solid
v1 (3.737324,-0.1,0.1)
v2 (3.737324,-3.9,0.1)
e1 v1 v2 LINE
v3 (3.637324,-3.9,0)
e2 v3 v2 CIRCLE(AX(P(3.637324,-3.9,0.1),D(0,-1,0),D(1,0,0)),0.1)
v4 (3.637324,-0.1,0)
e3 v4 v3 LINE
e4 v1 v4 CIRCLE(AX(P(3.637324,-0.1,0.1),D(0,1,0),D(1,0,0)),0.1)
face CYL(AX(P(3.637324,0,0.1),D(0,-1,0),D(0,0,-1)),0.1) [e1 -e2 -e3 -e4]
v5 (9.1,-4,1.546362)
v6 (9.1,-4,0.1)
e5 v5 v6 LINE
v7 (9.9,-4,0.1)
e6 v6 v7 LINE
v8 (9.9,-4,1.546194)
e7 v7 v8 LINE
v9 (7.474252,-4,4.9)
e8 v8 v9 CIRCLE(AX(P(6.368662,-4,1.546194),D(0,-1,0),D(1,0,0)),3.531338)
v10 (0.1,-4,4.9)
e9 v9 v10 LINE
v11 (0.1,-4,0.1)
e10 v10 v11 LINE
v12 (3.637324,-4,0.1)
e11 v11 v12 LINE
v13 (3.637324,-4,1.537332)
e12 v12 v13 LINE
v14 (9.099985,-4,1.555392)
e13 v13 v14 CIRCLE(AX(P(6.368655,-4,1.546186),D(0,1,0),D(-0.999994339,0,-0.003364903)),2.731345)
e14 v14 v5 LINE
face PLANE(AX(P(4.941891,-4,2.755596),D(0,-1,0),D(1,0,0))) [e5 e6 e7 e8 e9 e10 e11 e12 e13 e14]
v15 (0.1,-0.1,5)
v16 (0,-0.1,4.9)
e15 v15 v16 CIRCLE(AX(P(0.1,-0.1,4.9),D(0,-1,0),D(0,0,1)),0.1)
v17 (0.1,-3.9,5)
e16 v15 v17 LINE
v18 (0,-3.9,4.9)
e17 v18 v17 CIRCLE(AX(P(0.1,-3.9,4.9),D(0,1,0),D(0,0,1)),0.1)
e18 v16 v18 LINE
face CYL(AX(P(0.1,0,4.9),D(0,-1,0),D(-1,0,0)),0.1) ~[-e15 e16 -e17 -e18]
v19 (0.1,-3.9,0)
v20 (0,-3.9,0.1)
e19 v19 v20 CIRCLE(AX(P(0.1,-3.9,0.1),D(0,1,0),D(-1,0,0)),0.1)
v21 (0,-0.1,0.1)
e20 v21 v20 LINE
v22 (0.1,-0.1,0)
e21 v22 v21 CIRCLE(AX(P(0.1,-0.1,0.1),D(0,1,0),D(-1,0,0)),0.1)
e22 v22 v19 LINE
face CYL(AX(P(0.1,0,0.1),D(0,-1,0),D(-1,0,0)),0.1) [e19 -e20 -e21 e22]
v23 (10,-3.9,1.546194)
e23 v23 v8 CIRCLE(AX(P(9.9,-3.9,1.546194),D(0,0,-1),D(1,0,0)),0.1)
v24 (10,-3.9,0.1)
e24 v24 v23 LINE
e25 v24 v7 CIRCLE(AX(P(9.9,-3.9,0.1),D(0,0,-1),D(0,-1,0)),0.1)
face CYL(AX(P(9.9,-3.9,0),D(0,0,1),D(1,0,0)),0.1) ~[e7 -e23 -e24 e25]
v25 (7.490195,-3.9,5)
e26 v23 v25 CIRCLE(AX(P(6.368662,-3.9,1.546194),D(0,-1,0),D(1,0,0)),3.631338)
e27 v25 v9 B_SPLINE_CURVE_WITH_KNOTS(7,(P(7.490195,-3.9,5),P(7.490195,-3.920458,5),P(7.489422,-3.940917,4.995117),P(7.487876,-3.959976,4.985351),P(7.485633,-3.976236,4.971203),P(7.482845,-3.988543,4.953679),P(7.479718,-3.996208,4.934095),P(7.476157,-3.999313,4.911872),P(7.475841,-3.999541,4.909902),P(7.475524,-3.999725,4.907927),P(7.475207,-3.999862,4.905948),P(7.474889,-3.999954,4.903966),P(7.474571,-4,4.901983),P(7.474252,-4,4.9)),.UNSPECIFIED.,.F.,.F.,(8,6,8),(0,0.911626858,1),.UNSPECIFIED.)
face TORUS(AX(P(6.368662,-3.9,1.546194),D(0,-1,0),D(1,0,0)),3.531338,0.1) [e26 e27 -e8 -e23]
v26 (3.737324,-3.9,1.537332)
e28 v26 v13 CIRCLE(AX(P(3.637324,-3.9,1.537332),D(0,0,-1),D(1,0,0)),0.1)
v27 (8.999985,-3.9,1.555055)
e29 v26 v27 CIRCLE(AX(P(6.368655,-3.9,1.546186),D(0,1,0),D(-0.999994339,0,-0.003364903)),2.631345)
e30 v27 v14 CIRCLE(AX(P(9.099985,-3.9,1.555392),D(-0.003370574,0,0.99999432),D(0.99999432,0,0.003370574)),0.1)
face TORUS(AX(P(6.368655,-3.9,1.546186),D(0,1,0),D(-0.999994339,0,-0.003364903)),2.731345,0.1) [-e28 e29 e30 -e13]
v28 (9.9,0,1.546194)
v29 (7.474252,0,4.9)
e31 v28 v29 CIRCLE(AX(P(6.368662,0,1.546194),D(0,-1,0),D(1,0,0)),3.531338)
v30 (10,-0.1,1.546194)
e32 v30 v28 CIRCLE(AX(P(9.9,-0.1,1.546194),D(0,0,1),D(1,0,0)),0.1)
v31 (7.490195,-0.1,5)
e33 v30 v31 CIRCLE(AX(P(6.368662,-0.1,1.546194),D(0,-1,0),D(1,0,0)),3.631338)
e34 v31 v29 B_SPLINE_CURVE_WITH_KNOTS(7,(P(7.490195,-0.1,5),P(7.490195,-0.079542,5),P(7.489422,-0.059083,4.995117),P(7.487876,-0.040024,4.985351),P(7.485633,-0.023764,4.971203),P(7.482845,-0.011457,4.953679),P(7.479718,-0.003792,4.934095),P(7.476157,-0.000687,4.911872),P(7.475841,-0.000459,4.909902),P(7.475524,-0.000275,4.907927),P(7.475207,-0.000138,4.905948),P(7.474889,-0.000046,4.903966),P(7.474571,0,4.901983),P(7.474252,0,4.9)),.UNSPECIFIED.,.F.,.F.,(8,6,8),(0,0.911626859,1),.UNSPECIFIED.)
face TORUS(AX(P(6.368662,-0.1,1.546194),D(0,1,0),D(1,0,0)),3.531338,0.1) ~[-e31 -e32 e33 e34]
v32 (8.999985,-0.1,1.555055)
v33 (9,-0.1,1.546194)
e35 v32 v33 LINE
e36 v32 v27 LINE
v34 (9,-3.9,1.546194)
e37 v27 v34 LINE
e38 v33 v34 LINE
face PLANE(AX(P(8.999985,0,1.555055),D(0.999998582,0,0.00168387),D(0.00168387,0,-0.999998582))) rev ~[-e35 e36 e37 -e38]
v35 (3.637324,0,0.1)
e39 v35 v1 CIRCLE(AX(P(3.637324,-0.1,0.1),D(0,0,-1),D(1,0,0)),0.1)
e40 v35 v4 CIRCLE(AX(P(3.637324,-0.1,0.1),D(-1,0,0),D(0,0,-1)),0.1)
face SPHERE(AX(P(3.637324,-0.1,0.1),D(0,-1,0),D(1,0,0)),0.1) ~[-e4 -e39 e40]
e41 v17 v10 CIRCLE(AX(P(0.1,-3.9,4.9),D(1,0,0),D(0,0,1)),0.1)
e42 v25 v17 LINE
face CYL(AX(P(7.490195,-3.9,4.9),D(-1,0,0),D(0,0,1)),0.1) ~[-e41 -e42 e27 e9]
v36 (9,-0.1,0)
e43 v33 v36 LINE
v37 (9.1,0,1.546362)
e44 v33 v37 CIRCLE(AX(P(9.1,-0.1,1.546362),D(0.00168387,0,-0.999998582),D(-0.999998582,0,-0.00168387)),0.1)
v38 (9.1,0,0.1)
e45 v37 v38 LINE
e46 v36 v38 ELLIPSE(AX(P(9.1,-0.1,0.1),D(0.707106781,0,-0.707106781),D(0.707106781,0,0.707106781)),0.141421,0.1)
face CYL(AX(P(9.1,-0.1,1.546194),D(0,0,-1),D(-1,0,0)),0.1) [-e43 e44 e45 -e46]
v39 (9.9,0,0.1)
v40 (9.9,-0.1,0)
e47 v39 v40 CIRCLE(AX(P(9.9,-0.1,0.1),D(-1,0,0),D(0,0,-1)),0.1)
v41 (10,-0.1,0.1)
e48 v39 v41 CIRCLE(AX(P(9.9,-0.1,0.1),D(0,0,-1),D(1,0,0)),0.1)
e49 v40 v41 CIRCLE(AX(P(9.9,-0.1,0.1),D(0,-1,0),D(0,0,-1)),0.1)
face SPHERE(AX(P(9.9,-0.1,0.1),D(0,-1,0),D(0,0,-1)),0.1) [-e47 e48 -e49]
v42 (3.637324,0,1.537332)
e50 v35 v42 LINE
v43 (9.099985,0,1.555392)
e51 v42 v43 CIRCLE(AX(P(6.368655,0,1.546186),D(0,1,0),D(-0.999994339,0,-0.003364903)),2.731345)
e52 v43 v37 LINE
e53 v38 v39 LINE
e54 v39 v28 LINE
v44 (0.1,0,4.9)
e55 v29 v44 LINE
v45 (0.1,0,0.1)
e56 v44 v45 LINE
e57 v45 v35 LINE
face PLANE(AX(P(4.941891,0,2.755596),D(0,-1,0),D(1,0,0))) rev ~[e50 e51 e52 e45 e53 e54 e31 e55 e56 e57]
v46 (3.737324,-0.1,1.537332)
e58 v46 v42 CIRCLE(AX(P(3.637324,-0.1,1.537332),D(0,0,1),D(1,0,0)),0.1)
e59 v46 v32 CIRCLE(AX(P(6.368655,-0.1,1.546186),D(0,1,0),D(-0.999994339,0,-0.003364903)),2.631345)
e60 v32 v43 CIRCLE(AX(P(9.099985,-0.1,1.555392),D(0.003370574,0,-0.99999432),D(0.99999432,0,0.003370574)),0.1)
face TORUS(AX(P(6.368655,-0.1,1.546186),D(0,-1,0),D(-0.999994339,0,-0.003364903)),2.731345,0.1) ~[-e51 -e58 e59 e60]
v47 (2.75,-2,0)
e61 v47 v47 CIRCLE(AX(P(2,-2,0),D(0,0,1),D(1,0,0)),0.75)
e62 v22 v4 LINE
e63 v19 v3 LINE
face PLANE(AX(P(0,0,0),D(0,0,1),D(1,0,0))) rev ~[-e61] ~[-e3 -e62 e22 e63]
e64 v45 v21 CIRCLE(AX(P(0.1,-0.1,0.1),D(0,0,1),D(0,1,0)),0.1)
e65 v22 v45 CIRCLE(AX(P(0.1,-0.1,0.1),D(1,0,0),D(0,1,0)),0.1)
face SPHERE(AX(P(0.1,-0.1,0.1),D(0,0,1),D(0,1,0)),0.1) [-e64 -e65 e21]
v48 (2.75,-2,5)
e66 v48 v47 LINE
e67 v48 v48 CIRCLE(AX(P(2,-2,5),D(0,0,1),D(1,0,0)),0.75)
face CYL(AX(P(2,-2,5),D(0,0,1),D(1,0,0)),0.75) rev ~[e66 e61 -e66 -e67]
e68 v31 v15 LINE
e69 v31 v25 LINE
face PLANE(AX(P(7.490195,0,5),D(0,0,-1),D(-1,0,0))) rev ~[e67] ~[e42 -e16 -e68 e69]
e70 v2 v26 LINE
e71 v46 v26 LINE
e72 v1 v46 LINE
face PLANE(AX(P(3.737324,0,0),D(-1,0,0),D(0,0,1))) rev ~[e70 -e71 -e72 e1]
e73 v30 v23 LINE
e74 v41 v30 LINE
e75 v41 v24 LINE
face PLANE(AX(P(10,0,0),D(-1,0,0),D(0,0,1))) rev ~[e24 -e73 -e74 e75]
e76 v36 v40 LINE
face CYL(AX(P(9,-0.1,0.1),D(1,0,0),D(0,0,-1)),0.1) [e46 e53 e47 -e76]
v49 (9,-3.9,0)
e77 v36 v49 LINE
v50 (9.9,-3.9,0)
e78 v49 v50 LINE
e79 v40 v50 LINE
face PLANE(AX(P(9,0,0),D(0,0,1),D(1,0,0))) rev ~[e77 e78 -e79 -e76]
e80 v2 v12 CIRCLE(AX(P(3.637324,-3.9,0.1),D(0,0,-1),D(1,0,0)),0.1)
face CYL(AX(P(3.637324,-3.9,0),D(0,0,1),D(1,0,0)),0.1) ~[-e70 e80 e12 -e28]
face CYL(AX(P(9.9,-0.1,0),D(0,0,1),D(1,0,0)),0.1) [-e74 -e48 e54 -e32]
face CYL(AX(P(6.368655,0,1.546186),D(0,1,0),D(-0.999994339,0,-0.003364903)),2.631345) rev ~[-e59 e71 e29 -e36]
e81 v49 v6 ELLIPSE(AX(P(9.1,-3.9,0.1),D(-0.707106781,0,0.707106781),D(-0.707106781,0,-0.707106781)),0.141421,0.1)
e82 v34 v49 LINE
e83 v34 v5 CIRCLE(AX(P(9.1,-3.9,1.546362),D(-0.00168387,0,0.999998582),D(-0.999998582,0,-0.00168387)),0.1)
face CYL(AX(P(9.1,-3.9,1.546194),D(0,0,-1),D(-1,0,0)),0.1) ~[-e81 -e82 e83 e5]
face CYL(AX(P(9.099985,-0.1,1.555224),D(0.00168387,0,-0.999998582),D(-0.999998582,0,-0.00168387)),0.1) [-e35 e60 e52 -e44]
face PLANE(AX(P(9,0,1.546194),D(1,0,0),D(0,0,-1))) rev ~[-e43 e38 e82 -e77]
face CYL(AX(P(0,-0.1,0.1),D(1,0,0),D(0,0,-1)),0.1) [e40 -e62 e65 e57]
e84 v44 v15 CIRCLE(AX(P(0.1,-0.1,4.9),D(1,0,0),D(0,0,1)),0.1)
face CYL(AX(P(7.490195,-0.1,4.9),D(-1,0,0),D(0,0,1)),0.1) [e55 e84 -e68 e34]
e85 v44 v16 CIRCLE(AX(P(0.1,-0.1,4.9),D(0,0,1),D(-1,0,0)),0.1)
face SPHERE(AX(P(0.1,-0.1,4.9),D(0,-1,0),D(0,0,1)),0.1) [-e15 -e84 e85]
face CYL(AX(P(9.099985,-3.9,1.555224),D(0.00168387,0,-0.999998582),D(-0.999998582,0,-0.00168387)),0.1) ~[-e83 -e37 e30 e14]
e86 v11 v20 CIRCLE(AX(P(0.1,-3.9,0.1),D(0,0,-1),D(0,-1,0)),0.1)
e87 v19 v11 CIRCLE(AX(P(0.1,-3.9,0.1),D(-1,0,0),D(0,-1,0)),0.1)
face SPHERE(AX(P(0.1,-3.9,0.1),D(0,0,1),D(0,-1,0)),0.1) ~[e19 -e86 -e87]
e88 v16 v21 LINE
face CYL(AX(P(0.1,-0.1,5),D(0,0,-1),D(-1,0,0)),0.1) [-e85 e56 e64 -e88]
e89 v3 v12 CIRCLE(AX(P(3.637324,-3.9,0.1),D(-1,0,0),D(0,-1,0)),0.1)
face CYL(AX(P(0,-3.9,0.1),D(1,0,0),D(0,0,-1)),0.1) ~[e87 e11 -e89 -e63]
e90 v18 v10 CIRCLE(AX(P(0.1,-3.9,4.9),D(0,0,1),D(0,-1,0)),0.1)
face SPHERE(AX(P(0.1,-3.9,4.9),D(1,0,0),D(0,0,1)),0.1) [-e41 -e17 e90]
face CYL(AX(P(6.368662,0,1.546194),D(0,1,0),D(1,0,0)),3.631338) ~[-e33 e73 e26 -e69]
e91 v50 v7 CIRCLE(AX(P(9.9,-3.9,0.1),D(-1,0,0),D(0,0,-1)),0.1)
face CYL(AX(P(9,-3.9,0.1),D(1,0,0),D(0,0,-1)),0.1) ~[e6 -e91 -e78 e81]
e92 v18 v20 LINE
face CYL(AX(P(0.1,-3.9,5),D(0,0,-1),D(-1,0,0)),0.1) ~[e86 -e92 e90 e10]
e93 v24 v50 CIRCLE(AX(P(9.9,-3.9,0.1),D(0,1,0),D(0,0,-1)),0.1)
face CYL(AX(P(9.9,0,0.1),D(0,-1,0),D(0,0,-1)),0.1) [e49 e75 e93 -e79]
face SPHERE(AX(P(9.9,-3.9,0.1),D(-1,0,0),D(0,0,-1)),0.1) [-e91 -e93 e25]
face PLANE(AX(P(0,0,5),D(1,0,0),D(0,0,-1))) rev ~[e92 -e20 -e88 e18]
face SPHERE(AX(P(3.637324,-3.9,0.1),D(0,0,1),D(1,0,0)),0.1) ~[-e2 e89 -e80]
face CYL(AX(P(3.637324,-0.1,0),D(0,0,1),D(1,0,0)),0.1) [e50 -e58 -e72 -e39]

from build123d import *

# Parameters (mm, degrees)
F1_DEPTH = 4
F3_R     = 0.1
F2_R     = 0.75
F4_DEPTH = 25


# Not quite as in the source:
# - ends of sketch curves that miss each other by under 0.0002 mm in the source are joined


with BuildPart() as f1:
    # F0 (on Front) → F1 (new body)
    with BuildSketch(Plane.XZ):
        with BuildLine():
            Line((0, 5), (0, 0))
            Line((0, 0), (3.7373243831, 0))
            Line((3.7373243831, 0), (3.7373243831, 1.5373318456))
            ThreePointArc((3.7373243831, 1.5373318456), (6.3598005329, 4.1775164411), (8.9999850781, 1.5550552132))
            Line((8.9999850781, 1.5550552132), (9, 1.5461935545))
            Line((9, 1.5461935545), (9, 0))
            Line((9, 0), (9.6543736474, 0))
            ThreePointArc((9.6543736474, 0), (9.9125401886, 0.7540174245), (10, 1.5461935545))
            ThreePointArc((10, 1.5461935545), (9.3062869056, 3.680900869), (7.4901947663, 5))
            Line((7.4901947663, 5), (5.2471296168, 5))
            Line((5.2471296168, 5), (0, 5))
        make_face()
        with BuildLine():
            Line((10, 0), (10, 1.5461935545))
            ThreePointArc((10, 1.5461935545), (9.9125401886, 0.7540174245), (9.6543736474, 0))
            Line((9.6543736474, 0), (10, 0))
        make_face()
    extrude(amount=F1_DEPTH)

    # F3
    f3_edges = [f1.edges().sort_by_distance(p)[0] for p in [
        (3.745097, -4, 5),
        (0, -2, 5),
        (0, -4, 2.5),
        (6.359793, -4, 4.177516),
        (3.737324, -2, 0),
        (1.868662, -4, 0),
        (9.5, -4, 0),
        (10, -2, 0),
        (9.5, 0, 0),
        (10, 0, 0.773097),
        (10, -4, 0.773097),
        (3.737324, 0, 0.768666),
        (3.745097, 0, 5),
        (0, 0, 2.5),
        (1.868662, 0, 0),
        (0, -2, 0),
    ]]
    fillet(f3_edges, radius=F3_R)

    # F2 (on face) → F4 (cut)
    with BuildSketch(Plane.XY.offset(5)):
        with Locations((2, -2)):
            Circle(F2_R)
    extrude(amount=-F4_DEPTH, mode=Mode.SUBTRACT)


solid = f1.part
